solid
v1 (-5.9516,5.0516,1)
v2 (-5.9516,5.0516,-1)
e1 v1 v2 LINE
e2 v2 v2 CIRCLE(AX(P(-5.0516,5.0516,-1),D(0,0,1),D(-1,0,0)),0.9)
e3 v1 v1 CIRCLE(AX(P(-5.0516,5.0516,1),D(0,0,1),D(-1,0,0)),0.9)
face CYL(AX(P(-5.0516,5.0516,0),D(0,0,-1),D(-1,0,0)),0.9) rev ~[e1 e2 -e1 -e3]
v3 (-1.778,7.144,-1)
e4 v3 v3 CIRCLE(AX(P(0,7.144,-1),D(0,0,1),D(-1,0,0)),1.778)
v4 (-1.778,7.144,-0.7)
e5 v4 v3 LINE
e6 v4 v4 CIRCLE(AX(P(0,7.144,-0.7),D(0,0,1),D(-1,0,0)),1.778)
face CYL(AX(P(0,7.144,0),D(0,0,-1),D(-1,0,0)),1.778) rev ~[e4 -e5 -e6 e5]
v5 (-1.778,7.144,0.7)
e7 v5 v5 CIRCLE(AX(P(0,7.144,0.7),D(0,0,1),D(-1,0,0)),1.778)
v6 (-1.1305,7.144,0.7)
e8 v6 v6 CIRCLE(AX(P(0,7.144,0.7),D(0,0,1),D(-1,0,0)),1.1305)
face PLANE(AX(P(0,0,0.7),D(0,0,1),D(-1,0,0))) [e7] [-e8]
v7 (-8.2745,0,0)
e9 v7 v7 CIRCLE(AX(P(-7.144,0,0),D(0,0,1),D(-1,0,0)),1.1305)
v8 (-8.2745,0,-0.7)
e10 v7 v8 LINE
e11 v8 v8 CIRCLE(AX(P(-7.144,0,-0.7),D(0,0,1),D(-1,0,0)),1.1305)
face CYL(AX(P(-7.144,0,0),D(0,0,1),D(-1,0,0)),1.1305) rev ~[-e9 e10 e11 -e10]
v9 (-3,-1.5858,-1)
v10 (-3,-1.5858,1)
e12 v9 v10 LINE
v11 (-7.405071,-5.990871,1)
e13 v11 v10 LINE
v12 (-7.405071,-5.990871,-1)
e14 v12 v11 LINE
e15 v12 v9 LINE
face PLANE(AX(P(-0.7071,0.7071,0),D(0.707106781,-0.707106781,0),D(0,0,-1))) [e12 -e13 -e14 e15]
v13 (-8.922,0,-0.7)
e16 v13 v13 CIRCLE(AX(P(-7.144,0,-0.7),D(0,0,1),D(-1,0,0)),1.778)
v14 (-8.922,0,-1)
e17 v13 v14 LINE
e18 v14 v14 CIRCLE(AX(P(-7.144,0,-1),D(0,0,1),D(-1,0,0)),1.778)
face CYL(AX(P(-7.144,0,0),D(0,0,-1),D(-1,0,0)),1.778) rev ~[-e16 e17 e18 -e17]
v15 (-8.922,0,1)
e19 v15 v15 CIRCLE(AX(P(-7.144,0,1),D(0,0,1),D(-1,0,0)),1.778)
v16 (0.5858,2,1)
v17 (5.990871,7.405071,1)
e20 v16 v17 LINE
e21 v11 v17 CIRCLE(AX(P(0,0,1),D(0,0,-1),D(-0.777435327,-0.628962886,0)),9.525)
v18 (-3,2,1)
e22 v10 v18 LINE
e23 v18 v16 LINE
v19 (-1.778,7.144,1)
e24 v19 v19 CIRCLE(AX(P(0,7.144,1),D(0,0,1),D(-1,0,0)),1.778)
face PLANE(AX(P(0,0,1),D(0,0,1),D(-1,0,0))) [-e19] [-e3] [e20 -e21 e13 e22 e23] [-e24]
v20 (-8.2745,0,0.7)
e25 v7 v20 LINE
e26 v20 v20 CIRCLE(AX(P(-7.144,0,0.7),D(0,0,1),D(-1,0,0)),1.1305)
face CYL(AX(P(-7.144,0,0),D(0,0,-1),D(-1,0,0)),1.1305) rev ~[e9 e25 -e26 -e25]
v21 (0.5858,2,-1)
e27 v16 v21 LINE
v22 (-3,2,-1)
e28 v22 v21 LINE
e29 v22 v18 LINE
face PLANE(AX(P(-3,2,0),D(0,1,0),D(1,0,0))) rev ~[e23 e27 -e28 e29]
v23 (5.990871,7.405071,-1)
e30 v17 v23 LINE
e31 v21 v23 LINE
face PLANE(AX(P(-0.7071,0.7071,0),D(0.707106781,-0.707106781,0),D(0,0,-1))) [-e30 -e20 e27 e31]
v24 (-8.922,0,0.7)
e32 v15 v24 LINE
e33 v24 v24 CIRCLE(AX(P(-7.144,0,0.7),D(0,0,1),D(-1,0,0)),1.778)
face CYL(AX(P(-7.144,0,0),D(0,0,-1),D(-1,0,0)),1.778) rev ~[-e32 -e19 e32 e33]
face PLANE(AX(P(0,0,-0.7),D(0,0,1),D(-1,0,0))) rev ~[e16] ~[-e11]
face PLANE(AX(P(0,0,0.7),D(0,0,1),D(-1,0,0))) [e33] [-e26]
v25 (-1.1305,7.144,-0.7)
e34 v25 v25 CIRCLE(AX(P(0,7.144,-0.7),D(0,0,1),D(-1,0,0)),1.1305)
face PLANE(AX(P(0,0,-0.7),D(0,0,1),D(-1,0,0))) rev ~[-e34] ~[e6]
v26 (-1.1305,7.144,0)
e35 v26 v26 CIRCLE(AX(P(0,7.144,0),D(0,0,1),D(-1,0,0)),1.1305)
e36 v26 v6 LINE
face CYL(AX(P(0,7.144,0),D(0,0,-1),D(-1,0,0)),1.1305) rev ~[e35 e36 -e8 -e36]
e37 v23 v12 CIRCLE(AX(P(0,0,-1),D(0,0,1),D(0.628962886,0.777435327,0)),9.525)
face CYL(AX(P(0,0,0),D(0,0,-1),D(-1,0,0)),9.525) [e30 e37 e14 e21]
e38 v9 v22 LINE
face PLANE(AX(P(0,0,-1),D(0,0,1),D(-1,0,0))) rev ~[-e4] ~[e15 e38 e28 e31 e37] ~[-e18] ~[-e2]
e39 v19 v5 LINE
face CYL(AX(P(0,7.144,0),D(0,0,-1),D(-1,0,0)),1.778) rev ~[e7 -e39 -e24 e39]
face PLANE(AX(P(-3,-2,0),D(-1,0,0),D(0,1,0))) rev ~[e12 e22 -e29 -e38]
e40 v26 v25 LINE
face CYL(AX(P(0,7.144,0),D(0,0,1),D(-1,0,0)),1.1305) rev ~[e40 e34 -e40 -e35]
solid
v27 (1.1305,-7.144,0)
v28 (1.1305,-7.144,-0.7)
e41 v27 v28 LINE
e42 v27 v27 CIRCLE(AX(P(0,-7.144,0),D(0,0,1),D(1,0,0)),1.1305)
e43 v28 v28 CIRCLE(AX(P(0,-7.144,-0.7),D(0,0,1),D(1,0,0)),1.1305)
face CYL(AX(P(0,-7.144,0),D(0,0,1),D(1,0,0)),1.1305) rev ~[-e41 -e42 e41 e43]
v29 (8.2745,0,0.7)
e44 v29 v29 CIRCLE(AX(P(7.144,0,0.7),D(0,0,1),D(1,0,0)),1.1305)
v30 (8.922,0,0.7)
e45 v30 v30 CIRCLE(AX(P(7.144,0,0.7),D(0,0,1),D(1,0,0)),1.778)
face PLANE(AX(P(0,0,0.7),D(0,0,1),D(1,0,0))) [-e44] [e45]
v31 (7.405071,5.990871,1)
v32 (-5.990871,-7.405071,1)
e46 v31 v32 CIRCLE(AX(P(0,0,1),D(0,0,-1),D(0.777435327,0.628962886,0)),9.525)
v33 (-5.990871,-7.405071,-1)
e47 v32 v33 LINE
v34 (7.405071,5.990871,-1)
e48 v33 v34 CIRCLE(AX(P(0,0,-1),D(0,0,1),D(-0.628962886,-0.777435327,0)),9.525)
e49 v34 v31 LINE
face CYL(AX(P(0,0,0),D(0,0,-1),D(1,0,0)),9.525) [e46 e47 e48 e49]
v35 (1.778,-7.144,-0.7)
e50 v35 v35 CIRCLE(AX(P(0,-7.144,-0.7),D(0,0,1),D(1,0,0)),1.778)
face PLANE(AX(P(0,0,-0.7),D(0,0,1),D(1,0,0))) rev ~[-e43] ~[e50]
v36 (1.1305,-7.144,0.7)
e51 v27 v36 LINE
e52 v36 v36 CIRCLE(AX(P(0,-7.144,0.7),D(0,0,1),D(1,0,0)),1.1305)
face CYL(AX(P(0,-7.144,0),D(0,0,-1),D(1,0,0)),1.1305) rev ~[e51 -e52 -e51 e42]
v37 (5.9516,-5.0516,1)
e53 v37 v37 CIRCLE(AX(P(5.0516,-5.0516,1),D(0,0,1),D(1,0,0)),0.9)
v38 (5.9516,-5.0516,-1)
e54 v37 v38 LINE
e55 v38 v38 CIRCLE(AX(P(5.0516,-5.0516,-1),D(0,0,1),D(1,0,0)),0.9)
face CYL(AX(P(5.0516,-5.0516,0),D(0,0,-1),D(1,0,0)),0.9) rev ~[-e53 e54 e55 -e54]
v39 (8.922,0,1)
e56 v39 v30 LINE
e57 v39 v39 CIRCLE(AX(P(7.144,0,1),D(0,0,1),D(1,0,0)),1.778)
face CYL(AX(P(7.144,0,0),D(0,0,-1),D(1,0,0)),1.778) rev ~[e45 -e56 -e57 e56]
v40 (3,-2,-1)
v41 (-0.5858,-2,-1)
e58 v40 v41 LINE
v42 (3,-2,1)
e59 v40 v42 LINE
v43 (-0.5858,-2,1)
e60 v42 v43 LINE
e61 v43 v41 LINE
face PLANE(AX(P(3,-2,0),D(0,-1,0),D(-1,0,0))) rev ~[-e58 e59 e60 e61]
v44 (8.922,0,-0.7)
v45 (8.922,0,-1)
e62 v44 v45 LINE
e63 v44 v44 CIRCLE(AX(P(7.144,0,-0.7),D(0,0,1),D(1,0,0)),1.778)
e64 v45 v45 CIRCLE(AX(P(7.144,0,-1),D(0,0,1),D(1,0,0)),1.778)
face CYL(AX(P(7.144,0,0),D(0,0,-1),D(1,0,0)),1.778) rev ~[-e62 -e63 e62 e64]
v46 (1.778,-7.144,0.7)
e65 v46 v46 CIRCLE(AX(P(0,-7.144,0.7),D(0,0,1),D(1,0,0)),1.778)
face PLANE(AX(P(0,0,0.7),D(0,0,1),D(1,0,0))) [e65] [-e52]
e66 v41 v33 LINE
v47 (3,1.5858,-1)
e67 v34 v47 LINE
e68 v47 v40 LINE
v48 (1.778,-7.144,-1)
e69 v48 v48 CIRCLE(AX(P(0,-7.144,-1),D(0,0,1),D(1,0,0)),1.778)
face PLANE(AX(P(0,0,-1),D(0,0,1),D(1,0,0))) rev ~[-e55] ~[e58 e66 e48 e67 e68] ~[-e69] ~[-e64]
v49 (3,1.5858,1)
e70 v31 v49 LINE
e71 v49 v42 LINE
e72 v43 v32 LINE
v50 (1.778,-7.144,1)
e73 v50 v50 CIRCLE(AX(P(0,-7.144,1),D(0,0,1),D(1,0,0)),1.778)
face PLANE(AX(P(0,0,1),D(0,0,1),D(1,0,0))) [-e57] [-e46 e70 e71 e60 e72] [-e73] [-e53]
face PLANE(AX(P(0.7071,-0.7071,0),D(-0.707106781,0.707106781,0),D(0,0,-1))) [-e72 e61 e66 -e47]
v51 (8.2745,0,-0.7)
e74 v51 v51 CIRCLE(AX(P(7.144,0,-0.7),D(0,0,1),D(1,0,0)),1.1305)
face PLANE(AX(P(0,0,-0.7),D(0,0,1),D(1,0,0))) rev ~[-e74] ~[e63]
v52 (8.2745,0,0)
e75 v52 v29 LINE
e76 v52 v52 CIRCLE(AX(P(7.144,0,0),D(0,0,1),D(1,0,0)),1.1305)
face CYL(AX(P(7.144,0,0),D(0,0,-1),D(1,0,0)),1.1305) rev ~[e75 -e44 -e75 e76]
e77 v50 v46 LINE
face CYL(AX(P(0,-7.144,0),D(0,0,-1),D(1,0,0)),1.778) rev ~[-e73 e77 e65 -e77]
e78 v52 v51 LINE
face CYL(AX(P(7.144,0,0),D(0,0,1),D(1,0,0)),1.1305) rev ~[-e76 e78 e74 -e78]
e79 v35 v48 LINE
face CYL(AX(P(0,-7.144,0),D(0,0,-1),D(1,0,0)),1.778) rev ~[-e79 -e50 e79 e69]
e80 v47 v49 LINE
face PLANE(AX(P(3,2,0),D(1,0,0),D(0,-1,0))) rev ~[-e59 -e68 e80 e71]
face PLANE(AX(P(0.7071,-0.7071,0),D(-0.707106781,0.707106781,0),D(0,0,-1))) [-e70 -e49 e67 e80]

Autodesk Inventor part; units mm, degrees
ref_plane "YZ Plane" through (0, 0, 0) normal (1, 0, 0) x (0, 1, 0)
ref_plane "XZ Plane" through (0, 0, 0) normal (0, 1, 0) x (-1, 0, 0)
sketch "S-Flansch" plane through (0, 0, 0) normal (0, 0, 1) x (1, 0, 0)
  circle A0 centre (0, 0) radius 9.525
  circle A1 centre (0, 0) radius 7.144 construction
  circle A2 centre (0, 7.144) radius 1.1305
  circle A3 centre (0, 7.144) radius 1.778
  line L0 (0, 0) -> (5.0516, 5.0516) construction
  line L1 (0, 13.335) -> (0, -13.335) construction
  circle A4 centre (5.0516, 5.0516) radius 0.9
  circle A5 centre (-7.144, 0) radius 1.1305
  circle A6 centre (-7.144, 0) radius 1.778
  circle A7 centre (-5.0516, 5.0516) radius 0.9
  circle A8 centre (0, -7.144) radius 1.1305
  circle A9 centre (0, -7.144) radius 1.778
  circle A10 centre (-5.0516, -5.0516) radius 0.9
  circle A11 centre (7.144, 0) radius 1.1305
  circle A12 centre (7.144, 0) radius 1.778
  circle A13 centre (5.0516, -5.0516) radius 0.9
  line L2 (-3, 2) -> (3, 2)
  line L3 (3, 2) -> (3, -2)
  line L4 (3, -2) -> (-3, -2)
  line L5 (-3, -2) -> (-3, 2)
  line L6 (-3, 2) -> (3, -2) construction
  line L7 (3, 2) -> (-3, -2) construction
  line L8 (-1.8795, 0.94) -> (1.8795, 0.94)
  line L9 (1.8795, 0.94) -> (1.8795, -0.94)
  line L10 (1.8795, -0.94) -> (-1.8795, -0.94)
  line L11 (-1.8795, -0.94) -> (-1.8795, 0.94)
  line L12 (-1.8795, 0.94) -> (1.8795, -0.94) construction
  line L13 (1.8795, 0.94) -> (-1.8795, -0.94) construction
  dimension "d0" = 19.05
  dimension "d1" = 14.288
  dimension "d2" = 2.261
  dimension "d3" = 3.556
  dimension "d4" = 45
  dimension "d5" = 1.8
  dimension "d8" = 360
  dimension "d10" = 6
  dimension "d11" = 4
  dimension "d16" = 3.759
  dimension "d17" = 1.88
extrude "Ex-Flansch1" add sketch "S-Flansch" along normal mid plane 2 contours A0
ref_plane "Schnittebene" through (0.7071, -0.7071, 0) normal (0.7071068, -0.7071068, 0) x (0.7071068, 0.7071068, 0)
ref_plane "Querebene" through (0, 0, 0) normal (0.7071068, -0.7071068, 0) x (0.7071068, 0.7071068, 0)
split "Trennen-Schnitt" plane through (0.7071, -0.7071, 0) removes the side toward (-0.7071068, 0.7071068, 0)
extrude "Ex-Flansch2-Innengewinde" add sketch "S-Flansch" along normal mid plane 1.4 contours A9 | A12
pattern_circular "Runde Anordnung1" count 2 over 360 about axis through (0, 0, -10) along (0, 0, 1)
surface extrude "RWG-V-Band" sketch "S-Flansch" along normal mid plane 2 shown yes curves L9 L10 L11 L8
properties part number "RWG-V_Band Backingplate"
